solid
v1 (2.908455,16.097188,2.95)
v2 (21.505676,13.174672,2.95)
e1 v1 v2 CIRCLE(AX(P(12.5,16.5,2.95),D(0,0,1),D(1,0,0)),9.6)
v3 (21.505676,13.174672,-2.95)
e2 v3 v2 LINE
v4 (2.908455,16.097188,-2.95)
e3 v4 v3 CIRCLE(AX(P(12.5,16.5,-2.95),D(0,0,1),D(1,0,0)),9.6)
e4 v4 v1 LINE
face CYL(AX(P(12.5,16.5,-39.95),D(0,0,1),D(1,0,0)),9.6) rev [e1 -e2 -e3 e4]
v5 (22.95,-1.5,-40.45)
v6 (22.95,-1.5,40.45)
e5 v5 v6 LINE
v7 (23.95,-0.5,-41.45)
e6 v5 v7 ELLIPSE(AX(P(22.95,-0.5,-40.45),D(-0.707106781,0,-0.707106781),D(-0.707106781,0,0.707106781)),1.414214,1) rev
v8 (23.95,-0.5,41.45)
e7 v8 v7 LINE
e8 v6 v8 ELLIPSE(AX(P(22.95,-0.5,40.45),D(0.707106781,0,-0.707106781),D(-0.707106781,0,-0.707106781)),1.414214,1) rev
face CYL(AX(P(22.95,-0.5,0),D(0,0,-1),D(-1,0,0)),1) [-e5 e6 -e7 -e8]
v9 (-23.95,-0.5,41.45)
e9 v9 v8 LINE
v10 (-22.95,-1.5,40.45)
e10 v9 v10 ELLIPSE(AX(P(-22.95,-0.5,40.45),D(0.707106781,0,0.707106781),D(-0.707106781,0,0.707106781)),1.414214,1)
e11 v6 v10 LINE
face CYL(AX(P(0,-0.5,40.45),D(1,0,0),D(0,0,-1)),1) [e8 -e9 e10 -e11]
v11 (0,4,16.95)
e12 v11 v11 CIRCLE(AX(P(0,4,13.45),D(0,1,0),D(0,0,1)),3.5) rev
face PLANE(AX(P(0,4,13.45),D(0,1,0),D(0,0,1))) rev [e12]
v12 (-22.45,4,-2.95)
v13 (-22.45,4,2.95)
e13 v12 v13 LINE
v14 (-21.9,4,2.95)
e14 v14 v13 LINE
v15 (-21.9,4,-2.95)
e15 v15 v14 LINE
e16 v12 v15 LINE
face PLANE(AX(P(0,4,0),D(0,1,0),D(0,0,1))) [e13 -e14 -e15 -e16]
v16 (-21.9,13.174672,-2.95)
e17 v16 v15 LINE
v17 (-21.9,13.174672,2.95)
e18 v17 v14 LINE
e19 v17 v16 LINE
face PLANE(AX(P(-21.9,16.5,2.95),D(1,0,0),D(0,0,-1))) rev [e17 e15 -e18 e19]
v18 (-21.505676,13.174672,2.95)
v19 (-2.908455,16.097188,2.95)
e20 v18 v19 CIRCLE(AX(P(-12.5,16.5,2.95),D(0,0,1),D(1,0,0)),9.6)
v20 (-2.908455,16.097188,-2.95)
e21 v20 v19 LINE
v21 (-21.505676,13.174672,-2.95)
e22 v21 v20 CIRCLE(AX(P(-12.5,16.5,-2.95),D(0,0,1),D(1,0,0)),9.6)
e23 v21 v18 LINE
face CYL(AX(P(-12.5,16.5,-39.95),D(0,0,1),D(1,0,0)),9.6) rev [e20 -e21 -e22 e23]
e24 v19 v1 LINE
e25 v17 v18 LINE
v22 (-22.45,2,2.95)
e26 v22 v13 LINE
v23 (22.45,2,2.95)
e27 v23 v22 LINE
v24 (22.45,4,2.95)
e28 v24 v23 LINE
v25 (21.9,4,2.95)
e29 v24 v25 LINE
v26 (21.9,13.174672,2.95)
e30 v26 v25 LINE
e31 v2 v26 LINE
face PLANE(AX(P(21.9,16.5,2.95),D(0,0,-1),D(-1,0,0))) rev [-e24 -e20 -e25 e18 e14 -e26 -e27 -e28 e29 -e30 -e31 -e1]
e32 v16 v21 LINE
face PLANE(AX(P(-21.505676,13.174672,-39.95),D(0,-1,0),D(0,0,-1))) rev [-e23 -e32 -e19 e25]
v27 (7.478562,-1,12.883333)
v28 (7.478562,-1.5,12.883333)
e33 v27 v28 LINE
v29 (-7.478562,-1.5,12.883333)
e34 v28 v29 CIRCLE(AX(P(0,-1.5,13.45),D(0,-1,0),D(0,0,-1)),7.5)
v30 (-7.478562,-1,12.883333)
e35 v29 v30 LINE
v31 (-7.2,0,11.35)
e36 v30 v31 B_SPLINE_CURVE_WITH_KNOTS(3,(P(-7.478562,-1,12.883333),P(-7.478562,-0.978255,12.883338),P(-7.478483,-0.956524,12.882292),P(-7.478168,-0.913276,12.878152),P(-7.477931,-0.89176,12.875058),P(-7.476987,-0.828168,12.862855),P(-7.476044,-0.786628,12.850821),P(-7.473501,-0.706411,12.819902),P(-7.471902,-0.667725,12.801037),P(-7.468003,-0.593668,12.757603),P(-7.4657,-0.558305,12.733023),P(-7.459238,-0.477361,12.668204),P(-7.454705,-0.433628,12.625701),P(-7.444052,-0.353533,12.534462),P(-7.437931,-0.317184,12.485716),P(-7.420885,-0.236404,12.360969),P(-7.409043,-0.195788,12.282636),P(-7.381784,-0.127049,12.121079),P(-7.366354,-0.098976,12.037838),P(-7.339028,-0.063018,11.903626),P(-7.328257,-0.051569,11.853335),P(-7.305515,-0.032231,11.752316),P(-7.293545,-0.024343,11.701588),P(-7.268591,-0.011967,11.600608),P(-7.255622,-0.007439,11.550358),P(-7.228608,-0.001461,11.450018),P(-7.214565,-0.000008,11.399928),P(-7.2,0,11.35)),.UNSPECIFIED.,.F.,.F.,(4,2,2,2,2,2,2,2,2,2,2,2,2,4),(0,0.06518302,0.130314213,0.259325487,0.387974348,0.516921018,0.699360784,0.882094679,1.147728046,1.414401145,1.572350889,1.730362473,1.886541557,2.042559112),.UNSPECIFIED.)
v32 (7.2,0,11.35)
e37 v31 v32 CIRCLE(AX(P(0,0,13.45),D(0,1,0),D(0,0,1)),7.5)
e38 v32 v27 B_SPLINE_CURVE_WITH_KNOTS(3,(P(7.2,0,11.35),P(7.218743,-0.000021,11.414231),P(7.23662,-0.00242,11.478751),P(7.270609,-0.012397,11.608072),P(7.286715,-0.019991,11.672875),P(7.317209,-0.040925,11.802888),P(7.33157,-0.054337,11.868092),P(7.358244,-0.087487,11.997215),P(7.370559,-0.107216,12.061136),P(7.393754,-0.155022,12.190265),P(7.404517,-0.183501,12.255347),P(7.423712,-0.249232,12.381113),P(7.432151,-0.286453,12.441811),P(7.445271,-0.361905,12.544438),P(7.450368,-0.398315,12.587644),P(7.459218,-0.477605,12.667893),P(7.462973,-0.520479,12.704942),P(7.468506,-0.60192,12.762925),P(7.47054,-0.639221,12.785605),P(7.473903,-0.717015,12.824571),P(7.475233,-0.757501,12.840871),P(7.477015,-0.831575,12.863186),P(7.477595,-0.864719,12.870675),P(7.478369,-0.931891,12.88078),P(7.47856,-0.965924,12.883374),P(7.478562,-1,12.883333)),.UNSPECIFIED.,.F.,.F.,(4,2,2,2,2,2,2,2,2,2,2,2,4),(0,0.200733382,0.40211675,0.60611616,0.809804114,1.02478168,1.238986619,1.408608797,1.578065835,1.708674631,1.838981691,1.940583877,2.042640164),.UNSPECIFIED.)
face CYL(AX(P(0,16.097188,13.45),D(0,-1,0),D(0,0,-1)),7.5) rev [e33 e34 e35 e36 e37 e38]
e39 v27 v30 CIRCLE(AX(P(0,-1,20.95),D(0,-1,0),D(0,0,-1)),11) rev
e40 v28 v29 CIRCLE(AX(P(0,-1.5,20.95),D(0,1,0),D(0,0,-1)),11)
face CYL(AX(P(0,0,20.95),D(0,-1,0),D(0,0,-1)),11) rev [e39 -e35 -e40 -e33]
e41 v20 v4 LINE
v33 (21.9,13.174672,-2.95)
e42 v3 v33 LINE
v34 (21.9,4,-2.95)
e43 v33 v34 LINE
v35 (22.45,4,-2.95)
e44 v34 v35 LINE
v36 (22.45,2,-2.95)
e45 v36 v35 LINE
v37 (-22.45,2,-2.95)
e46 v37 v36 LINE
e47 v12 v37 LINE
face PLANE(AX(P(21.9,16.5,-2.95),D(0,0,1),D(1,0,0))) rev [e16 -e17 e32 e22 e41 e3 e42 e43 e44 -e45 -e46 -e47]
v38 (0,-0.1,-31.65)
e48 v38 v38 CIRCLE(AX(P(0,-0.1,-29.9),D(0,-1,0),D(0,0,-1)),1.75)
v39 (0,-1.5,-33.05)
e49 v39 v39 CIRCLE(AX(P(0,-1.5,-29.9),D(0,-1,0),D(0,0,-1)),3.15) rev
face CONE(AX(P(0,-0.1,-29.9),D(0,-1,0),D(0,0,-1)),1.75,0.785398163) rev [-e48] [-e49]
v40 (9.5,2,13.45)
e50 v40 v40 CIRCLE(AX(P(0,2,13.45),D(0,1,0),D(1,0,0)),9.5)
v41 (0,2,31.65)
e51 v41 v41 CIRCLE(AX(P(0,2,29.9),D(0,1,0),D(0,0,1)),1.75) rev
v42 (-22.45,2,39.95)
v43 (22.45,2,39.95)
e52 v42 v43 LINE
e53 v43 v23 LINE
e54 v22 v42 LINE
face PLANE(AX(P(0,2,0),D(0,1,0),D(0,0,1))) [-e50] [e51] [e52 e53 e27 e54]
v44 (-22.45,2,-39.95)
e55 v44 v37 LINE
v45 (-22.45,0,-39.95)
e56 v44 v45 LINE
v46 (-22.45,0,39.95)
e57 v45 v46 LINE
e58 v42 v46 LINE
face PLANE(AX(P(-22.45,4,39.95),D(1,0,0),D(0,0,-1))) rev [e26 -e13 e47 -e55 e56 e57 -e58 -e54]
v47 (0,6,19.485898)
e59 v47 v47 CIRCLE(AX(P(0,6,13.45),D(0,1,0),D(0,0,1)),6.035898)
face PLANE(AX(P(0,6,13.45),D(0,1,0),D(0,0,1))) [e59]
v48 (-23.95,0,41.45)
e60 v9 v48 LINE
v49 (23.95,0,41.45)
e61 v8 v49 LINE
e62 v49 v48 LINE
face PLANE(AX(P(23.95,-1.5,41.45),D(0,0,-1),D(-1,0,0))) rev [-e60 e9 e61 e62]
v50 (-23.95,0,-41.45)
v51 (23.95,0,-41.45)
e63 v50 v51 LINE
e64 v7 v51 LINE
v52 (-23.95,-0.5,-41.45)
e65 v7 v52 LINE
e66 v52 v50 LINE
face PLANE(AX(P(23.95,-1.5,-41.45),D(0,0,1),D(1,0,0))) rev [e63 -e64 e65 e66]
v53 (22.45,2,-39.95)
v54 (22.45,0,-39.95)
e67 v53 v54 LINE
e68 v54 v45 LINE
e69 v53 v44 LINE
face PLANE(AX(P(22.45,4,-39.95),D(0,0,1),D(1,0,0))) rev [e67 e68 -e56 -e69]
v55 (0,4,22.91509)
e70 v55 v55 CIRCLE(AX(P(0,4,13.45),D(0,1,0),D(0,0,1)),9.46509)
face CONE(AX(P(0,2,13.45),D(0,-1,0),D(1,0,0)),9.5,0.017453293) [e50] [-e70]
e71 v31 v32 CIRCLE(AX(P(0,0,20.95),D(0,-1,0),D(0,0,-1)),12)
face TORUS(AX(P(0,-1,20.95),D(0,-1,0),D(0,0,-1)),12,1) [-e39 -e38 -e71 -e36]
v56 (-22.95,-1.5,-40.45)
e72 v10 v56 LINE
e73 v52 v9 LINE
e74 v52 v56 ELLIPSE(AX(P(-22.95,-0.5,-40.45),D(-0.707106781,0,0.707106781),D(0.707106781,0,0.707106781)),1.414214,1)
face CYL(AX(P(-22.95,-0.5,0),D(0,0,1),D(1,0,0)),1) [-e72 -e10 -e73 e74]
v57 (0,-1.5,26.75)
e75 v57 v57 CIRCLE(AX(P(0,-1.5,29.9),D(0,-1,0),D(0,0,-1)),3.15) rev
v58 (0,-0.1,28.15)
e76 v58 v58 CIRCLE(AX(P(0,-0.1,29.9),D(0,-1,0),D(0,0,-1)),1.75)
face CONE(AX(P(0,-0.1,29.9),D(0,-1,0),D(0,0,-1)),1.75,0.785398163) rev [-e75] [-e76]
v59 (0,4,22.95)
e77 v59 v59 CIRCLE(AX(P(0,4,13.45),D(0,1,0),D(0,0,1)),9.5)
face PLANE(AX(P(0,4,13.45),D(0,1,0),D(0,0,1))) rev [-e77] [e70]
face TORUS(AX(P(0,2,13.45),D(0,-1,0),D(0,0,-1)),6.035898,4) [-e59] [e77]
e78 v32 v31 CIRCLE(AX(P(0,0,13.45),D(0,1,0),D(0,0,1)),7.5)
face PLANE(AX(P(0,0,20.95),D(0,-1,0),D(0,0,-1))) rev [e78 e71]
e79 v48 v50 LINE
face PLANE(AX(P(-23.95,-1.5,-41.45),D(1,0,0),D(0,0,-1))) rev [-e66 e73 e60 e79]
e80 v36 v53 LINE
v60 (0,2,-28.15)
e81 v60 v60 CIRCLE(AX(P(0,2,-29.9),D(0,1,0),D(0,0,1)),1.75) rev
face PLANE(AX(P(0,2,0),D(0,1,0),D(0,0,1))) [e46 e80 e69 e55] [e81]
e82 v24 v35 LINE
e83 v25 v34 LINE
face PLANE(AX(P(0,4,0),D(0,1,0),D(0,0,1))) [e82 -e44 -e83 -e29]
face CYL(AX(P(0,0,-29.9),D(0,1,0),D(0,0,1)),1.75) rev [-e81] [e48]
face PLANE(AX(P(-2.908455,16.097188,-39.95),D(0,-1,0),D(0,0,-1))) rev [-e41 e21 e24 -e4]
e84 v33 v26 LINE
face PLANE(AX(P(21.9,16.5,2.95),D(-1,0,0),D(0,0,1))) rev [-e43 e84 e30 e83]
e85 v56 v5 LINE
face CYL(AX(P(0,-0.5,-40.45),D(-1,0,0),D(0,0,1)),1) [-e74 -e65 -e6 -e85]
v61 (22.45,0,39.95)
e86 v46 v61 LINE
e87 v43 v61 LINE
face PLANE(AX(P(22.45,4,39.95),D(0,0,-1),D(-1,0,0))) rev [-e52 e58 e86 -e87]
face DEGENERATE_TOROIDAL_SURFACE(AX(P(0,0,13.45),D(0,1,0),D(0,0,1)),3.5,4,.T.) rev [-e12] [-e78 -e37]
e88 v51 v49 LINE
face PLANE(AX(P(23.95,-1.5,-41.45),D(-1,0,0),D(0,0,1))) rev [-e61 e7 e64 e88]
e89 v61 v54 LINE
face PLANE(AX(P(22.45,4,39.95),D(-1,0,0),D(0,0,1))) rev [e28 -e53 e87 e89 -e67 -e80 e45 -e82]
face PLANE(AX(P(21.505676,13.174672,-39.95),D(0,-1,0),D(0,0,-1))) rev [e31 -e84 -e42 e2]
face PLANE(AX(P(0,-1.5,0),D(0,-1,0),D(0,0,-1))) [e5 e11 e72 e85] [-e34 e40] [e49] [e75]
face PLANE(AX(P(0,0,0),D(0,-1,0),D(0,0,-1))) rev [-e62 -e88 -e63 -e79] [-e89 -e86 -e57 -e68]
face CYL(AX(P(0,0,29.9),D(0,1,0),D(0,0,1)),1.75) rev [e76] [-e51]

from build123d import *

# Parameters (mm, degrees)
SKETCH_1_W          = 44.9
SKETCH_1_H          = 79.9
EXTRUDE_1_DEPTH     = 4
SKETCH_2_W          = 43.8
SKETCH_2_H          = 5.9
EXTRUDE_2_DEPTH     = 12.5
CUT_EXTRUDE_6_DEPTH = 52.15332345
SKETCH_7_R          = 1.75
CUT_EXTRUDE_7_DEPTH = 48.395642792
SKETCH_8_W          = 47.9
SKETCH_8_H          = 82.9
SKETCH_8_R          = 1.75
EXTRUDE_3_DEPTH     = 1.5
FILLET_1_R          = 1
SKETCH_9_R          = 7.5
CUT_EXTRUDE_8_DEPTH = 52.003588333
CHAMFER_1_SIZE      = 1.4
SKETCH_10_W         = 47.9
SKETCH_10_H         = 38.5
CUT_EXTRUDE_9_DEPTH = 2
SKETCH_11_R         = 9.5
SKETCH_11_R_2       = 7.5
EXTRUDE_1_2_DEPTH   = 2
EXTRUDE_1_2_DRAFT   = 1
SKETCH_12_R         = 9.5
EXTRUDE_4_DEPTH     = 2
FILLET_2_R          = 4
EXTRUDE_5_DEPTH     = 1.5
FILLET_3_R          = 1


with BuildPart() as part:
    # Эскиз1 → Extrude 1 (new body)
    with BuildSketch(Plane(origin=(0, 0, 0), x_dir=(1, 0, 0), z_dir=(0, 1, 0))):
        Rectangle(SKETCH_1_W, SKETCH_1_H)
    extrude(amount=EXTRUDE_1_DEPTH)

    # Эскиз2 → Бобышка-Вытянуть2 (add)
    with BuildSketch(Plane(origin=(0, 4, 0), x_dir=(1, 0, 0), z_dir=(0, 1, 0))):
        Rectangle(SKETCH_2_W, SKETCH_2_H)
    extrude(amount=EXTRUDE_2_DEPTH)

    # Эскиз3 → Вырез-Вытянуть6 (cut, through all)
    with BuildSketch(Plane.XY.offset(2.95)):
        with BuildLine():
            Line((-2.908454638, 16.097187923), (2.908454638, 16.097187923))
            ThreePointArc((2.908454638, 16.097187923), (11.009669484, 7.016387031), (21.505675783, 13.174672393))
            Line((21.505675783, 13.174672393), (23.649512702, 13.174672393))
            Line((23.649512702, 13.174672393), (22.1, 16.5))
            ThreePointArc((22.1, 16.5), (19.288225099, 23.288225099), (12.5, 26.1))
            Line((12.5, 26.1), (-12.5, 26.1))
            ThreePointArc((-12.5, 26.1), (-19.288225099, 23.288225099), (-22.1, 16.5))
            Line((-22.1, 16.5), (-23.550546649, 13.174672393))
            Line((-23.550546649, 13.174672393), (-21.505675783, 13.174672393))
            ThreePointArc((-21.505675783, 13.174672393), (-11.009669484, 7.016387031), (-2.908454638, 16.097187923))
        make_face()
    extrude(amount=-CUT_EXTRUDE_6_DEPTH, mode=Mode.SUBTRACT)

    # Эскиз7 → Вырез-Вытянуть7 (cut, through all)
    with BuildSketch(Plane(origin=(0, 4, 0), x_dir=(1, 0, 0), z_dir=(0, 1, 0))):
        with Locations(Location((0, -29.9, 0), (0, 0, 270))):
            Circle(SKETCH_7_R)
        with Locations(Location((0, 29.9, 0), (0, 0, 270))):
            Circle(SKETCH_7_R)
    extrude(amount=-CUT_EXTRUDE_7_DEPTH, mode=Mode.SUBTRACT)

    # Эскиз8 → Бобышка-Вытянуть3 (add)
    with BuildSketch(Plane.XZ):
        Rectangle(SKETCH_8_W, SKETCH_8_H)
        with Locations(Location((0, 29.9, 0), (0, 0, 90))):
            Circle(SKETCH_8_R, mode=Mode.SUBTRACT)
        with Locations(Location((0, -29.9, 0), (0, 0, 90))):
            Circle(SKETCH_8_R, mode=Mode.SUBTRACT)
    extrude(amount=EXTRUDE_3_DEPTH)

    # Скругление1
    fillet_1_edges = [part.edges().sort_by_distance(p)[0] for p in [
        (-23.95, -1.5, 0),
        (0, -1.5, -41.45),
        (23.95, -1.5, 0),
        (0, -1.5, 41.45),
    ]]
    fillet(fillet_1_edges, radius=FILLET_1_R)

    # Эскиз9 → Вырез-Вытянуть8 (cut, through all)
    with BuildSketch(Plane.XZ.offset(1.5)):
        with Locations(Location((0, 13.45, 0), (0, 0, 270))):
            Circle(SKETCH_9_R)
    extrude(amount=-CUT_EXTRUDE_8_DEPTH, mode=Mode.SUBTRACT)

    # Фаска1
    chamfer_1_edges = [part.edges().sort_by_distance(p)[0] for p in [
        (0, -1.5, 28.15),
        (0, -1.5, -31.65),
    ]]
    chamfer(chamfer_1_edges, length=CHAMFER_1_SIZE)

    # Эскиз10 → Вырез-Вытянуть9 (cut)
    with BuildSketch(Plane(origin=(0, 4, 0), x_dir=(1, 0, 0), z_dir=(0, 1, 0))):
        with Locations((0, 22.2)):
            Rectangle(SKETCH_10_W, SKETCH_10_H)
        with Locations((0, -22.2)):
            Rectangle(SKETCH_10_W, SKETCH_10_H)
    extrude(amount=-CUT_EXTRUDE_9_DEPTH, mode=Mode.SUBTRACT)


with BuildPart() as extrude_1_2_tool:
    # Эскиз11 → Extrude 1 2 (with draft: the straight prism first)
    with BuildSketch(Plane(origin=(0, 2, 0), x_dir=(1, 0, 0), z_dir=(0, 1, 0))):
        with Locations((0, -13.45)):
            Circle(SKETCH_11_R)
        with Locations((0, -13.45)):
            Circle(SKETCH_11_R_2, mode=Mode.SUBTRACT)
    extrude(amount=EXTRUDE_1_2_DEPTH)
    # Extrude 1 2: the draft: its side faces are tilted about the plane it starts from
    extrude_1_2_sides = [extrude_1_2_tool.faces().sort_by_distance(p)[0] for p in [
        (-9.5, 3, 13.45),
        (-7.5, 3, 13.45),
    ]]
    draft(extrude_1_2_sides, Plane(origin=(0, 2, 0), x_dir=(1, 0, 0), z_dir=(0, 1, 0)), EXTRUDE_1_2_DRAFT)


with BuildPart() as part_1:
    add(part.part)

    # Extrude 1 2: add extrude_1_2_tool
    add(extrude_1_2_tool.part)

    # Эскиз12 → Бобышка-Вытянуть4 (add)
    with BuildSketch(Plane(origin=(0, 4, 0), x_dir=(1, 0, 0), z_dir=(0, 1, 0))):
        with Locations(Location((0, -13.45, 0), (0, 0, 270))):
            Circle(SKETCH_12_R)
    extrude(amount=EXTRUDE_4_DEPTH)

    # Скругление2
    # the kernel refuses this fillet: 4 mm, written as the material it takes off along each edge
    with BuildSketch(Plane(origin=(0, 6, 13.45), x_dir=(0, 0, 1), z_dir=(-1, 0, 0))) as fillet_2_piece_1:
        with BuildLine():
            CenterArc((6.035898385, -4), FILLET_2_R, 30, 60)
            Line((6.035898385, 0), (6.035898385, 0.08))
            Line((6.035898385, 0.08), (9.5, 0.08))
            Line((9.5, 0.08), (9.58, 0))
            ThreePointArc((9.58, 0), (9.58, -1), (9.569282032, -1.96))
            Line((9.569282032, -1.96), (9.5, -2))
        make_face()
    revolve(axis=Axis((0, 6, 13.45), (0, 1, 0)), mode=Mode.SUBTRACT)
    # the kernel refuses this fillet: 4 mm, written as the material it takes off along each edge
    with BuildSketch(Plane(origin=(0, 2, 13.45), x_dir=(0.9999318130918542, 0, -0.011677720960747706), z_dir=(-0.011677720960747706, 0, -0.9999318130918542))) as fillet_2_2_piece_1:
        with BuildLine():
            CenterArc((7.5 + FILLET_2_R, FILLET_2_R * 0.00872686779076), FILLET_2_R, 180, 1)
            Line((7.5 + FILLET_2_R * 0.000152304843608, -FILLET_2_R * 0.00872553864652), (7.5 - FILLET_2_R * 0.0198446490595, -FILLET_2_R * 0.00907458677527))
            Line((7.5 - FILLET_2_R * 0.0198446490595, -FILLET_2_R * 0.00907458677527), (7.5 - FILLET_2_R * 0.02, -FILLET_2_R * 0.000174537355815))
            Line((7.5 - FILLET_2_R * 0.02, -FILLET_2_R * 0.000174537355815), (7.5 - FILLET_2_R * 0.02, FILLET_2_R * 0.00872686779076))
            Line((7.5 - FILLET_2_R * 0.02, FILLET_2_R * 0.00872686779076), (7.5, FILLET_2_R * 0.00872686779076))
        make_face()
    revolve(axis=Axis((0, 2, 13.45), (0, -1, 0)), revolution_arc=271.338198667, mode=Mode.SUBTRACT)
    # the kernel refuses this fillet: 4 mm, written as the material it adds along each edge
    with BuildSketch(Plane(origin=(0, 4, 13.45), x_dir=(1, 0, 0), z_dir=(0, 0, 1))) as fillet_2_3_piece_1_section:
        with BuildLine():
            CenterArc((3.5, -4), FILLET_2_R, 0, 90)
            Line((3.5, 0), (3.5, 0.4))
            Line((3.5, 0.4), (7.53491013, 0.4))
            Line((7.53491013, 0.4), (7.934849208, -0.006980963))
            ThreePointArc((7.934849208, -0.006980963), (7.9, -2.034907471), (7.9, -4))
            Line((7.9, -4), (7.5, -4))
        make_face()
    fillet_2_3_piece_1 = revolve(axis=Axis((0, 4, 13.45), (0, 1, 0)), mode=Mode.PRIVATE)
    fillet_2_3_piece_1 = split(fillet_2_3_piece_1, bisect_by=Plane(origin=(0, 4, 13.45), z_dir=(0.011677720960747706, 0, 0.9999318130918542)), keep=Keep.TOP, mode=Mode.PRIVATE)
    fillet_2_3_piece_1 = split(fillet_2_3_piece_1, bisect_by=Plane(origin=(0, 4, 13.45), z_dir=(0.9999318130918542, 0, 0.011677720960747469)), keep=Keep.TOP, mode=Mode.PRIVATE)
    add(fillet_2_3_piece_1)
    with BuildSketch(Plane(origin=(0, 4, 13.45), x_dir=(1, 0, 0), z_dir=(0, 0, 1))) as fillet_2_3_piece_2_section:
        with BuildLine():
            CenterArc((3.5, -4), FILLET_2_R, 0, 90)
            Line((3.5, 0), (3.5, 0.4))
            Line((3.5, 0.4), (7.53491013, 0.4))
            Line((7.53491013, 0.4), (7.934849208, -0.006980963))
            ThreePointArc((7.934849208, -0.006980963), (7.9, -2.034907471), (7.9, -4))
            Line((7.9, -4), (7.5, -4))
        make_face()
    fillet_2_3_piece_2 = revolve(axis=Axis((0, 4, 13.45), (0, 1, 0)), mode=Mode.PRIVATE)
    fillet_2_3_piece_2 = split(fillet_2_3_piece_2, bisect_by=Plane(origin=(0, 4, 13.45), z_dir=(-0.011677720960747706, 0, -0.9999318130918542)), keep=Keep.TOP, mode=Mode.PRIVATE)
    fillet_2_3_piece_2 = split(fillet_2_3_piece_2, bisect_by=Plane(origin=(0, 4, 13.45), z_dir=(0.9999318130918542, 0, 0.011677720960747469)), keep=Keep.TOP, mode=Mode.PRIVATE)
    add(fillet_2_3_piece_2)
    with BuildSketch(Plane(origin=(0, 4, 13.45), x_dir=(1, 0, 0), z_dir=(0, 0, 1))) as fillet_2_3_piece_3_section:
        with BuildLine():
            CenterArc((3.5, -4), FILLET_2_R, 0, 90)
            Line((3.5, 0), (3.5, 0.4))
            Line((3.5, 0.4), (7.53491013, 0.4))
            Line((7.53491013, 0.4), (7.934849208, -0.006980963))
            ThreePointArc((7.934849208, -0.006980963), (7.9, -2.034907471), (7.9, -4))
            Line((7.9, -4), (7.5, -4))
        make_face()
    fillet_2_3_piece_3 = revolve(axis=Axis((0, 4, 13.45), (0, 1, 0)), mode=Mode.PRIVATE)
    fillet_2_3_piece_3 = split(fillet_2_3_piece_3, bisect_by=Plane(origin=(0, 4, 13.45), z_dir=(0.011677720960747706, 0, 0.9999318130918542)), keep=Keep.TOP, mode=Mode.PRIVATE)
    fillet_2_3_piece_3 = split(fillet_2_3_piece_3, bisect_by=Plane(origin=(0, 4, 13.45), z_dir=(-0.9999318130918542, 0, -0.011677720960747469)), keep=Keep.TOP, mode=Mode.PRIVATE)
    add(fillet_2_3_piece_3)
    with BuildSketch(Plane(origin=(0, 4, 13.45), x_dir=(1, 0, 0), z_dir=(0, 0, 1))) as fillet_2_3_piece_4_section:
        with BuildLine():
            CenterArc((3.5, -4), FILLET_2_R, 0, 90)
            Line((3.5, 0), (3.5, 0.4))
            Line((3.5, 0.4), (7.53491013, 0.4))
            Line((7.53491013, 0.4), (7.934849208, -0.006980963))
            ThreePointArc((7.934849208, -0.006980963), (7.9, -2.034907471), (7.9, -4))
            Line((7.9, -4), (7.5, -4))
        make_face()
    fillet_2_3_piece_4 = revolve(axis=Axis((0, 4, 13.45), (0, 1, 0)), mode=Mode.PRIVATE)
    fillet_2_3_piece_4 = split(fillet_2_3_piece_4, bisect_by=Plane(origin=(0, 4, 13.45), z_dir=(-0.011677720960747706, 0, -0.9999318130918542)), keep=Keep.TOP, mode=Mode.PRIVATE)
    fillet_2_3_piece_4 = split(fillet_2_3_piece_4, bisect_by=Plane(origin=(0, 4, 13.45), z_dir=(-0.9999318130918542, 0, -0.011677720960747469)), keep=Keep.TOP, mode=Mode.PRIVATE)
    add(fillet_2_3_piece_4)

    # Эскиз13 → Бобышка-Вытянуть5 (add)
    with BuildSketch(Plane.XZ.offset(1.5)):
        with BuildLine():
            Line((-11, 20.95), (-11, 3.952706076))
            Line((-11, 3.952706076), (11, 3.952706076))
            Line((11, 3.952706076), (11, 20.95))
            ThreePointArc((11, 20.95), (0, 9.95), (-11, 20.95))
        make_face()
    extrude(amount=-EXTRUDE_5_DEPTH)

    # Скругление3
    # the kernel refuses this fillet: 1 mm, written as the material it takes off along each edge
    with BuildSketch(Plane(origin=(0, 0, 20.95), x_dir=(0.827668100134072, 0, -0.5612178864046082), z_dir=(0.5612178864046082, 0, 0.827668100134072))) as fillet_3_piece_1_section:
        with BuildLine():
            CenterArc((11 + FILLET_3_R, -FILLET_3_R), FILLET_3_R, 90, 90)
            Line((11 + FILLET_3_R, 0), (11, 0))
            Line((11, 0), (11, -FILLET_3_R))
        make_face()
    fillet_3_piece_1 = revolve(axis=Axis((0, 0, 20.95), (0, 1, 0)), revolution_arc=111.719870778, mode=Mode.PRIVATE)
    fillet_3_piece_1 = fillet_3_piece_1 & Plane(origin=(0, 0, 13.45), x_dir=(0, 0, -1), z_dir=(0, -1, 0)) * Cylinder(7.5, 49, mode=Mode.PRIVATE)
    add(fillet_3_piece_1, mode=Mode.SUBTRACT)


solid = part_1.part
